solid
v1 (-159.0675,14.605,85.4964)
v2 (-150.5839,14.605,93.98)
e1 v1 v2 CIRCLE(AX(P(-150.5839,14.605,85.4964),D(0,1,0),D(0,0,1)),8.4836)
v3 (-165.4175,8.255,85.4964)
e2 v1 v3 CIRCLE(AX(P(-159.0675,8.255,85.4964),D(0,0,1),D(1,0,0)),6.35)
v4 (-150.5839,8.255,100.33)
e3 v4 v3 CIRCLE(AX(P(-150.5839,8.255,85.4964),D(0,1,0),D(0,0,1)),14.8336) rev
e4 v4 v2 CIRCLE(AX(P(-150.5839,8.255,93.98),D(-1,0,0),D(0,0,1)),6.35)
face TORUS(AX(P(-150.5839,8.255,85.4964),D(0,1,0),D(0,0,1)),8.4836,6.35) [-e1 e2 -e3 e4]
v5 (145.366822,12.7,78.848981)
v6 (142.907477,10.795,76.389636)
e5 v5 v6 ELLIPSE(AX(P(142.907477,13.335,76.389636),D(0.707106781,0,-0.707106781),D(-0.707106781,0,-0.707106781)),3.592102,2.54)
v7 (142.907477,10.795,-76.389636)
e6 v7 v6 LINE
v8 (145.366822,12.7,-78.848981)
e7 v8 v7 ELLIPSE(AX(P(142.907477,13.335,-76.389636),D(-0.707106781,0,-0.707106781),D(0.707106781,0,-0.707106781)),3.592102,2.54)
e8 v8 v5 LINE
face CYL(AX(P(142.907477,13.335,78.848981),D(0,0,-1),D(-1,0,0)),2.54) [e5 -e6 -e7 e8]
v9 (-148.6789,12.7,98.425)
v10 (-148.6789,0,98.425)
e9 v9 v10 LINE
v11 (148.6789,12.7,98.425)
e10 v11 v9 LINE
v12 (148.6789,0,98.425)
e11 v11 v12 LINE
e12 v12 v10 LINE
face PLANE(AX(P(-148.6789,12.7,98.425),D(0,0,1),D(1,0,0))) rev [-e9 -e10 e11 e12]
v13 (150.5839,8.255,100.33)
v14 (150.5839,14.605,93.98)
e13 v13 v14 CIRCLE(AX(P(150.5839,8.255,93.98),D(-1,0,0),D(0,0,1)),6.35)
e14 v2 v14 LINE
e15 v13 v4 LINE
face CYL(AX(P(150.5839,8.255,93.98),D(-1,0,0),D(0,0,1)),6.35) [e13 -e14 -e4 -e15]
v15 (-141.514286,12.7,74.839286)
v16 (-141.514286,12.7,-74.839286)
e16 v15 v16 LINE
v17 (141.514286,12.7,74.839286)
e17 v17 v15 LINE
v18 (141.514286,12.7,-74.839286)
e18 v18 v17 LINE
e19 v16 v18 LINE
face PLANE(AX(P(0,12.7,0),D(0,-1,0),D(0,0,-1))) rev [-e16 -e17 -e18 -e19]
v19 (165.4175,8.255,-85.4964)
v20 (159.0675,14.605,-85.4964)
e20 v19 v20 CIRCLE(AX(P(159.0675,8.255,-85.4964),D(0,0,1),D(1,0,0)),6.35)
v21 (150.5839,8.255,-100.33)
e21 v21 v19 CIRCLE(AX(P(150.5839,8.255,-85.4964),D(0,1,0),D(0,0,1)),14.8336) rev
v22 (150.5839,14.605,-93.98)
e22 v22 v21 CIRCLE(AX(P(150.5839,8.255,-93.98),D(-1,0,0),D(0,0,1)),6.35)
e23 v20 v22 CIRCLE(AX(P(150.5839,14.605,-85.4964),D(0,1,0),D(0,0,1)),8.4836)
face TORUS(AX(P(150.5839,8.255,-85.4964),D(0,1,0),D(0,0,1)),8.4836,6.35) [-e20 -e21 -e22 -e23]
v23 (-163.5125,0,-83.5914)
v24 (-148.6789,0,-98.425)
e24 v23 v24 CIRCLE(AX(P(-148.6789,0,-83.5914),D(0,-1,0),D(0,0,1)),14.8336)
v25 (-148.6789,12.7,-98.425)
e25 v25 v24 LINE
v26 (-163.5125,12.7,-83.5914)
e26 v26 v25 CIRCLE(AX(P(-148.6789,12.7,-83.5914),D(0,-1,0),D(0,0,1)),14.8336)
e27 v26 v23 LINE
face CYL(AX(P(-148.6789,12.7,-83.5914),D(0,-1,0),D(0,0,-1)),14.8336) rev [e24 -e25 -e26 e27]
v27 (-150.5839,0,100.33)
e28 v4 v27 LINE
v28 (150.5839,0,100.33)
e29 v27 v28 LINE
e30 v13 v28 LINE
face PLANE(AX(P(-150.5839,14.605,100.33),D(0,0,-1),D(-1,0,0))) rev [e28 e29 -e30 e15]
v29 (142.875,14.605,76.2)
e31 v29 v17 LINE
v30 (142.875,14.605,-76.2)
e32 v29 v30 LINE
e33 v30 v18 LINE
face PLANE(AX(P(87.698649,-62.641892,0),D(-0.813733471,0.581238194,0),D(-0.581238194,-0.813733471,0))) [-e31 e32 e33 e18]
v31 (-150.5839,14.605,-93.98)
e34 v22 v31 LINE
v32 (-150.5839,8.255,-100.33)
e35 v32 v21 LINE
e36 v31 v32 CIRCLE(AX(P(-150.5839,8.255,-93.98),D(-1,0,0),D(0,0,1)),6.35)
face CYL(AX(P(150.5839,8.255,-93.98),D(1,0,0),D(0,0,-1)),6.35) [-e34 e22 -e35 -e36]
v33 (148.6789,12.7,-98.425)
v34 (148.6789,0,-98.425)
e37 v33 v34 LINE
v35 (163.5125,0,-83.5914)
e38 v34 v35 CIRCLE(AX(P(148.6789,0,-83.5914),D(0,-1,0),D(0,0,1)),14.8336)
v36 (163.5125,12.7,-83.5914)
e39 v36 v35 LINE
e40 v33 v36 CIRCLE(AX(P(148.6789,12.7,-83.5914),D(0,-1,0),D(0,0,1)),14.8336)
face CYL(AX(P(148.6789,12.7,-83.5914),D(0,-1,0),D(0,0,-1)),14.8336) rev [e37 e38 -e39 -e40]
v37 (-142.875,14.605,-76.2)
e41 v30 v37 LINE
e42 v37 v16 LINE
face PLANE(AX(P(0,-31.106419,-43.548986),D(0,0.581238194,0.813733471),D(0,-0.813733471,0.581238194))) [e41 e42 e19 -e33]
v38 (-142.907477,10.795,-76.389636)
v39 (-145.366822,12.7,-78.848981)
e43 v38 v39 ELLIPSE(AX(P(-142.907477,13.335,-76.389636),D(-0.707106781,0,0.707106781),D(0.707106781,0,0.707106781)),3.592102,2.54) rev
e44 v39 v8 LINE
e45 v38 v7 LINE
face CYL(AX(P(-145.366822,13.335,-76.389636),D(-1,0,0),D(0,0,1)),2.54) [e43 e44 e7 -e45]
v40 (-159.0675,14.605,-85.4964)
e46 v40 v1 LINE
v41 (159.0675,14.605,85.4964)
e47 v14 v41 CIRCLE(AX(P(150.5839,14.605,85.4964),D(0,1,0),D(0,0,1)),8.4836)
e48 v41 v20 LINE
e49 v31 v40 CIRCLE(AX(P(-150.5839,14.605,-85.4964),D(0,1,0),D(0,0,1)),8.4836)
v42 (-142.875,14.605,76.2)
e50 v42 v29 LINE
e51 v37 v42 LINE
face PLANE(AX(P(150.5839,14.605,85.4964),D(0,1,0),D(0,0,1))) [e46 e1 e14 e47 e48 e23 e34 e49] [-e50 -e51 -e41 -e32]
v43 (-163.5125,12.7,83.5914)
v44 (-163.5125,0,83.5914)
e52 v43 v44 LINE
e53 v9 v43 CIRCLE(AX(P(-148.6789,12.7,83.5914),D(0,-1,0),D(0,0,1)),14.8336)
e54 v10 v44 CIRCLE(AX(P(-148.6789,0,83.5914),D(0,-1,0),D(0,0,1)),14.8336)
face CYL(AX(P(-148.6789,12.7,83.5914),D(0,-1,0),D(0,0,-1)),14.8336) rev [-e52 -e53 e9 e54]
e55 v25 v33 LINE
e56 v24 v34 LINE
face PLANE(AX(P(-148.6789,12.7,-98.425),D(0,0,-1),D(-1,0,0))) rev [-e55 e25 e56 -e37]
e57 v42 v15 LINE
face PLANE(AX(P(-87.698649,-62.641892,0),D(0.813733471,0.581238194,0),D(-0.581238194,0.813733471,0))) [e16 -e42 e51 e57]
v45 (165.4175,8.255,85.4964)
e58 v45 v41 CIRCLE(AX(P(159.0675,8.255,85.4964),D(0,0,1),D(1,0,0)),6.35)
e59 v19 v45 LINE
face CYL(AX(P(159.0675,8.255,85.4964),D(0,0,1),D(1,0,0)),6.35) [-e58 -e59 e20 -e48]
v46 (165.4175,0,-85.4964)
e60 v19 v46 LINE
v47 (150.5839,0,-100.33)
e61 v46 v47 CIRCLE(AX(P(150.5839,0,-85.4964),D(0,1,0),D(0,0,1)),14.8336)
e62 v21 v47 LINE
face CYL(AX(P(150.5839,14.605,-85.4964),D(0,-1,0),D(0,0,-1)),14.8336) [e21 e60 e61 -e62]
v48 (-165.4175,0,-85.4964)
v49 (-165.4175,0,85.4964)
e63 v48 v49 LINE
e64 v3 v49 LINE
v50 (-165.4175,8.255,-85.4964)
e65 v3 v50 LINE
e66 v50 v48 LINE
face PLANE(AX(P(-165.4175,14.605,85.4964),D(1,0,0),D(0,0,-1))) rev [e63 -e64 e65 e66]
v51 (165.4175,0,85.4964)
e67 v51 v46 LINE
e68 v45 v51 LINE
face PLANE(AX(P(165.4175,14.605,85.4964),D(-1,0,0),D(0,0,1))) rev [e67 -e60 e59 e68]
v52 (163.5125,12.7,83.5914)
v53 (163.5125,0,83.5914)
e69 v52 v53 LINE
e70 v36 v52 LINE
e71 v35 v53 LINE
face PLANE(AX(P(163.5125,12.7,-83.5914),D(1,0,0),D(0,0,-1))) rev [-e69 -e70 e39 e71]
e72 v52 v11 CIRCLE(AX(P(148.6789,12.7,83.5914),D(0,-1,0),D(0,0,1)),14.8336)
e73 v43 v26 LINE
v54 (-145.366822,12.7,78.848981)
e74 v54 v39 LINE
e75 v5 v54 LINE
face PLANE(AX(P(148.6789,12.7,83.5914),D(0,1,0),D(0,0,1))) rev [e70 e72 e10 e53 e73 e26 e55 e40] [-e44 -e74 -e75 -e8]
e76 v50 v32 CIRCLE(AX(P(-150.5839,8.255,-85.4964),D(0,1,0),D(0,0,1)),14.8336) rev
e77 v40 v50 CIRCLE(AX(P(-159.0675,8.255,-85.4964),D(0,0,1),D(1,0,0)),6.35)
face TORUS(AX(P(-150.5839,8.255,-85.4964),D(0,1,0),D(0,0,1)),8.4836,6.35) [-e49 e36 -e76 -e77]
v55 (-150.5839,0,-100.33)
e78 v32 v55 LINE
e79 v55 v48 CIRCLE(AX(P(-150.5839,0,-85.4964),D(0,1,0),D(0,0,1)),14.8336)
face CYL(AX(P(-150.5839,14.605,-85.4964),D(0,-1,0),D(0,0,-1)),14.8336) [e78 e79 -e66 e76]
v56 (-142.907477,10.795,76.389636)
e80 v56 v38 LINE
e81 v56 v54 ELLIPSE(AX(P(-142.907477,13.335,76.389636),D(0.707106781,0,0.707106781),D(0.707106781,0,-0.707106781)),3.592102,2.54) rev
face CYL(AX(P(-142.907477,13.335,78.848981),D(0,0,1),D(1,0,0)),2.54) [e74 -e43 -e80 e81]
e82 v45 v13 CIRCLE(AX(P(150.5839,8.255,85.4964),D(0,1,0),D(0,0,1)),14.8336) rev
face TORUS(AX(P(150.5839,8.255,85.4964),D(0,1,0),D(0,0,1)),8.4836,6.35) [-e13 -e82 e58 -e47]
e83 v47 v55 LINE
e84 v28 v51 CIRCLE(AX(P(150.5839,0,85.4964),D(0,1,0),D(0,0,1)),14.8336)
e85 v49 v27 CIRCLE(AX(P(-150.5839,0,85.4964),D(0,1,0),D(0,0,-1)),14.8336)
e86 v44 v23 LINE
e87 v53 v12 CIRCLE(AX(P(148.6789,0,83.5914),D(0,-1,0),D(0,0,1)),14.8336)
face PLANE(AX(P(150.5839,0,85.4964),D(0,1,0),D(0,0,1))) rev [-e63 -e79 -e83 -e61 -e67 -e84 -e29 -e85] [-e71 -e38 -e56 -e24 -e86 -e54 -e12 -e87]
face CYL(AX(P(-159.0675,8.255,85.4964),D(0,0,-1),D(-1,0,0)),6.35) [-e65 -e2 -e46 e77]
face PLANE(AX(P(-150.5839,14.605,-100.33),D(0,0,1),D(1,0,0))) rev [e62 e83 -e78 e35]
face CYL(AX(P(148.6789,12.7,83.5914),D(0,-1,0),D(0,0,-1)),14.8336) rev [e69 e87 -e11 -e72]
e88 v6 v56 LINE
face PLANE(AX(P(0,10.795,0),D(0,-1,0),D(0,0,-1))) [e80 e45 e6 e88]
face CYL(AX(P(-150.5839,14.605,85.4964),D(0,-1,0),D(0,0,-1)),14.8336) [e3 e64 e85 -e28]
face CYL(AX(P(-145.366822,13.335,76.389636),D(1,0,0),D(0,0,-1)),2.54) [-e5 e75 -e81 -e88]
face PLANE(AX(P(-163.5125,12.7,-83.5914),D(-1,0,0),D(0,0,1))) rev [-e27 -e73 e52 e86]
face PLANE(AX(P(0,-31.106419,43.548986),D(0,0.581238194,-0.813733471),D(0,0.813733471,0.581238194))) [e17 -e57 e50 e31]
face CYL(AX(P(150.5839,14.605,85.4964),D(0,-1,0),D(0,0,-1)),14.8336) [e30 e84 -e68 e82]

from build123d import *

# Parameters (mm, degrees)
BOSS_EXTRUDE1_DEPTH = 14.605
FILLET1_R           = 6.35
CUT_EXTRUDE1_DEPTH  = 12.7
SKETCH5_W           = 290.733643468
SKETCH5_H           = 157.6979616
BOSS_EXTRUDE2_DEPTH = 1.905
FILLET2_R           = 2.54


with BuildPart() as part:
    # Sketch1 → Boss-Extrude1 (new body)
    with BuildSketch(Plane(origin=(0, 0, 0), x_dir=(1, 0, 0), z_dir=(0, 1, 0))):
        with BuildLine():
            Line((-150.5839, -100.33), (150.5839, -100.33))
            ThreePointArc((150.5839, -100.33), (161.072839149, -95.985339149), (165.4175, -85.4964))
            Line((165.4175, -85.4964), (165.4175, 85.4964))
            ThreePointArc((165.4175, 85.4964), (161.072839149, 95.985339149), (150.5839, 100.33))
            Line((150.5839, 100.33), (-150.5839, 100.33))
            ThreePointArc((-150.5839, 100.33), (-161.072839149, 95.985339149), (-165.4175, 85.4964))
            Line((-165.4175, 85.4964), (-165.4175, -85.4964))
            ThreePointArc((-165.4175, -85.4964), (-161.072839149, -95.985339149), (-150.5839, -100.33))
        make_face()
    extrude(amount=BOSS_EXTRUDE1_DEPTH)

    # Fillet1
    fillet1_edges = [part.edges().sort_by_distance(p)[0] for p in [
        (161.072839149, 14.605, -95.985339149),
        (0, 14.605, -100.33),
        (-161.072839149, 14.605, -95.985339149),
        (-165.4175, 14.605, 0),
        (-161.072839149, 14.605, 95.985339149),
        (0, 14.605, 100.33),
        (161.072839149, 14.605, 95.985339149),
        (165.4175, 14.605, 0),
    ]]
    fillet(fillet1_edges, radius=FILLET1_R)

    # Sketch2 → Cut-Extrude1 (cut)
    with BuildSketch(Plane.XZ):
        with BuildLine():
            Line((-148.6789, -98.425), (148.6789, -98.425))
            ThreePointArc((148.6789, -98.425), (159.167839149, -94.080339149), (163.5125, -83.5914))
            Line((163.5125, -83.5914), (163.5125, 83.5914))
            ThreePointArc((163.5125, 83.5914), (159.167839149, 94.080339149), (148.6789, 98.425))
            Line((148.6789, 98.425), (-148.6789, 98.425))
            ThreePointArc((-148.6789, 98.425), (-159.167839149, 94.080339149), (-163.5125, 83.5914))
            Line((-163.5125, 83.5914), (-163.5125, -83.5914))
            ThreePointArc((-163.5125, -83.5914), (-159.167839149, -94.080339149), (-148.6789, -98.425))
        make_face()
    extrude(amount=-CUT_EXTRUDE1_DEPTH, mode=Mode.SUBTRACT)

    # Sketch3 → Cut-Loft1 section 0
    with BuildSketch(Plane(origin=(0, 14.605, 0), x_dir=(1, 0, 0), z_dir=(0, 1, 0))):
        with BuildLine():
            Line((-142.875, -76.2), (142.875, -76.2))
            Line((142.875, -76.2), (142.875, 76.2))
            Line((142.875, 76.2), (-142.875, 76.2))
            Line((-142.875, 76.2), (-142.875, -76.2))
        make_face()
    # Sketch4 → Cut-Loft1 section 1
    with BuildSketch(Plane(origin=(0, 10.16, 0), x_dir=(1, 0, 0), z_dir=(0, 1, 0))):
        with BuildLine():
            Line((-139.7, -73.025), (139.7, -73.025))
            Line((139.7, -73.025), (139.7, 73.025))
            Line((139.7, 73.025), (-139.7, 73.025))
            Line((-139.7, 73.025), (-139.7, -73.025))
        make_face()
    loft(mode=Mode.SUBTRACT)

    # Sketch5 → Boss-Extrude2 (add)
    with BuildSketch(Plane.XZ.offset(-12.7)):
        Rectangle(SKETCH5_W, SKETCH5_H)
    extrude(amount=BOSS_EXTRUDE2_DEPTH)

    # Fillet2
    # the kernel refuses this fillet: 2.54 mm, written as the material it takes off along each edge
    with BuildSketch(Plane(origin=(151.515182796, 10.795, -78.8489808), x_dir=(0, 1, 0), z_dir=(-1, 0, 0)), Plane(origin=(-151.515182796, 10.795, 78.8489808), x_dir=(0, 1, 0), z_dir=(1, 0, 0))) as fillet2_piece_1:
        with BuildLine():
            CenterArc((2.54, -2.459344425), FILLET2_R, 104.477512186, 75.522487814)
            Line((0, -2.459344425), (-0.0508, -2.459344425))
            Line((-0.0508, -2.459344425), (-0.0508, 0))
            Line((-0.0508, 0), (0, 0.0508))
            ThreePointArc((0, 0.0508), (0.9525, 0.0508), (1.8923, 0.049186888))
            Line((1.8923, 0.049186888), (1.905, 0))
        make_face()
    extrude(amount=303.030365593, mode=Mode.SUBTRACT)
    with BuildSketch(Plane(origin=(-145.366821734, 10.795, -84.997341863), x_dir=(0, 1, 0), z_dir=(0, 0, 1)), Plane(origin=(145.366821734, 10.795, 84.997341863), x_dir=(0, 1, 0), z_dir=(0, 0, -1))) as fillet2_piece_2:
        with BuildLine():
            CenterArc((2.54, -2.459344425), FILLET2_R, 104.477512186, 75.522487814)
            Line((0, -2.459344425), (-0.0508, -2.459344425))
            Line((-0.0508, -2.459344425), (-0.0508, 0))
            Line((-0.0508, 0), (0, 0.0508))
            ThreePointArc((0, 0.0508), (0.9525, 0.0508), (1.8923, 0.049186888))
            Line((1.8923, 0.049186888), (1.905, 0))
        make_face()
    extrude(amount=169.994683725, mode=Mode.SUBTRACT)


solid = part.part
